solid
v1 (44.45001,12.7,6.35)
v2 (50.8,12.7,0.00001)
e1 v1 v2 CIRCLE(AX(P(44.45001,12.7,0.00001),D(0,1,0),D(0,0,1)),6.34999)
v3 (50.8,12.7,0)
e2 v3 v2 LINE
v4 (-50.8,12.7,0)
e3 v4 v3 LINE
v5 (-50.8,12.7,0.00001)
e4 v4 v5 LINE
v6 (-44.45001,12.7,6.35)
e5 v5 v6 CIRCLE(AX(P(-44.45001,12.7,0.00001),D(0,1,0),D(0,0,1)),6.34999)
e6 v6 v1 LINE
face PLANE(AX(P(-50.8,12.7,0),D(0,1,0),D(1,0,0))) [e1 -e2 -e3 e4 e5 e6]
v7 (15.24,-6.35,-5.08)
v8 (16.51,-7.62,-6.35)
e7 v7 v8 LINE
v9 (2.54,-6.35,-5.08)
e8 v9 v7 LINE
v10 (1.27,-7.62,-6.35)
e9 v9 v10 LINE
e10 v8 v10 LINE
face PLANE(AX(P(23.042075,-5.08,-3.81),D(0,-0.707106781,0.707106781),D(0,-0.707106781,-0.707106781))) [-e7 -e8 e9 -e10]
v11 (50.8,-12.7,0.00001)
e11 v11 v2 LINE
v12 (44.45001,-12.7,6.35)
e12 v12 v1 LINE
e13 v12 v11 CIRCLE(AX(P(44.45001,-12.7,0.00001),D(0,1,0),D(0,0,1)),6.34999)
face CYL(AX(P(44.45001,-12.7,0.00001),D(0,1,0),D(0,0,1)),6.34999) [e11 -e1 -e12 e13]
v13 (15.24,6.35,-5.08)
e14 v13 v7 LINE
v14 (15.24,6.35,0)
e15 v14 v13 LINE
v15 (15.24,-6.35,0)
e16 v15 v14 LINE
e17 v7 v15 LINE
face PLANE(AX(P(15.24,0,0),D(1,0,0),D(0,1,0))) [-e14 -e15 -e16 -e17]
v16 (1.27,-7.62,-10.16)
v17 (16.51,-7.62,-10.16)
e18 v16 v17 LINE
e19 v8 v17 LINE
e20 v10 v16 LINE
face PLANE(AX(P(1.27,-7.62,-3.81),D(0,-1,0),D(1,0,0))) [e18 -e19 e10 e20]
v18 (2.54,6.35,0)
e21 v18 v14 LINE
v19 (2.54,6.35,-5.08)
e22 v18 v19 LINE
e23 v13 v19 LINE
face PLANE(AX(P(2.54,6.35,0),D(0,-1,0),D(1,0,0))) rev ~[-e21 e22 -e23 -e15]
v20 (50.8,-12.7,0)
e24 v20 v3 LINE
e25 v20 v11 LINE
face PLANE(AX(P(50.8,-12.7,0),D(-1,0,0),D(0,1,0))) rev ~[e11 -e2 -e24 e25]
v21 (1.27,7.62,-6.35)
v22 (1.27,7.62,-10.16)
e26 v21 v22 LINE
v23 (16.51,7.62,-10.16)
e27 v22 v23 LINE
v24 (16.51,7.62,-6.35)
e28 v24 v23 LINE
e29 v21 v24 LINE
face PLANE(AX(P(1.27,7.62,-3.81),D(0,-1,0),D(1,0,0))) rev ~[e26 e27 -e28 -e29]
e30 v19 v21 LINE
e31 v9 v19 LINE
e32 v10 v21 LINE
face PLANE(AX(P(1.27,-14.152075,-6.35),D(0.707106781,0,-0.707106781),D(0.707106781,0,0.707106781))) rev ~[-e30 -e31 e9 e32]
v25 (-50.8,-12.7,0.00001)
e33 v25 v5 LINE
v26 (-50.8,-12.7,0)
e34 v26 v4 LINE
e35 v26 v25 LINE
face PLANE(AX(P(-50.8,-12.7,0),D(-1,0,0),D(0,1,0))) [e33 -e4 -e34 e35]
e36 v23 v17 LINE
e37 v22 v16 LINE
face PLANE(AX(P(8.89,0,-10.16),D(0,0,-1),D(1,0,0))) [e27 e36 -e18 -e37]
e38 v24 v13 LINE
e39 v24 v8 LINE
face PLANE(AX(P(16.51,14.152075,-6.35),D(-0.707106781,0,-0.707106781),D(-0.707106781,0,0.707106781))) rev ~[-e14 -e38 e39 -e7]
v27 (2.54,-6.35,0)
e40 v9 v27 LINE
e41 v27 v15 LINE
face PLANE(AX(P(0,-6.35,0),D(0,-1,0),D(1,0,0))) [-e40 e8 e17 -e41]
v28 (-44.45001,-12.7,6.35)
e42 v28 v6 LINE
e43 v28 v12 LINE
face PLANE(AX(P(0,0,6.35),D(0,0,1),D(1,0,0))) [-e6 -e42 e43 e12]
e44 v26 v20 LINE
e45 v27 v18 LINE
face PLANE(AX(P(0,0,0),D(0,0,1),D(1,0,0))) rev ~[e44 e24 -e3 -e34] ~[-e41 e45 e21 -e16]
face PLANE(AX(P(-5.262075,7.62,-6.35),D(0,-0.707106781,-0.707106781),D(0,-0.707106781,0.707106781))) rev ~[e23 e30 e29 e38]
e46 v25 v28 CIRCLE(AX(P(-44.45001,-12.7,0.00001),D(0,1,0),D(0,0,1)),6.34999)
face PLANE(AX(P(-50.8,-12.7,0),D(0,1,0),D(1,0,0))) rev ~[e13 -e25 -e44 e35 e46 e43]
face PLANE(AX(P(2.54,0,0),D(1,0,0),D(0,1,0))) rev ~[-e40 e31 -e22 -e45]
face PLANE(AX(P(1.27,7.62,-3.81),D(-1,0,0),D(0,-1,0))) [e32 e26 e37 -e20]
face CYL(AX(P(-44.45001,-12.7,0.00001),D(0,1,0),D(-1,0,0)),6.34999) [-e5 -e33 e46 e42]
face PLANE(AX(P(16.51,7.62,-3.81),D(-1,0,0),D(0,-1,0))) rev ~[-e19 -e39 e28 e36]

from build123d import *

# Parameters (mm, degrees)
F0_W          = 101.6
F0_H          = 25.4
F0_W_2        = 12.7
F0_H_2        = 12.7
F1_DEPTH      = 6.35
F2_R          = 6.34999
F3_R          = 6.34999
F4_DEPTH      = 3.81
F5_W          = 15.24
F5_H          = 15.24
F5_W_2        = 12.7
F5_H_2        = 12.7
F6_DEPTH      = 6.35
F7_T4_DEPTH   = 28.3041495789
F7_T10_DEPTH  = 28.3041495789
F7_T16_DEPTH  = 28.3041495789
F7_T23_DEPTH  = 28.3041495789
F7_T29_DEPTH  = 28.3041495789
F7_T35_DEPTH  = 28.3041495789
F7_T41_DEPTH  = 28.3041495789
F7_T47_DEPTH  = 28.3041495789
F7_T54_DEPTH  = 28.3041495789
F7_T60_DEPTH  = 28.3041495789
F7_T66_DEPTH  = 28.3041495789
F7_T72_DEPTH  = 28.3041495789
F7_T78_DEPTH  = 28.3041495789
F7_T85_DEPTH  = 28.3041495789
F7_T91_DEPTH  = 28.3041495789
F7_T97_DEPTH  = 28.3041495789
F7_T103_DEPTH = 28.3041495789
F7_T109_DEPTH = 28.3041495789
F7_T116_DEPTH = 28.3041495789
F7_T122_DEPTH = 28.3041495789


# Not quite as in the source:
# - a fillet or chamfer that OpenCascade refuses, or shapes differently, is made with other operations: its cross-section is extruded or revolved along the edge and cut away or added
# - a fillet or chamfer is up to 0.001 mm smaller than in the source, because OpenCascade refuses the exact size


with BuildPart() as f1:
    # F0 (on Top) → F1 (new body)
    with BuildSketch(Plane.XY):
        Rectangle(F0_W, F0_H)
        with Locations((8.89, 0)):
            Rectangle(F0_W_2, F0_H_2, mode=Mode.SUBTRACT)
        with Locations((8.89, 0)):
            Rectangle(F0_W_2, F0_H_2)
    extrude(amount=F1_DEPTH)

    # F2 (radius 6.35 in the source; OpenCascade refuses exactly that, so slightly less here)
    f2_edges = [f1.edges().sort_by_distance(p)[0] for p in [
        (-50.8, 0, 6.35),
    ]]
    fillet(f2_edges, radius=F2_R)

    # F3 (radius 6.35 in the source; OpenCascade refuses exactly that, so slightly less here)
    f3_edges = [f1.edges().sort_by_distance(p)[0] for p in [
        (50.8, 0, 6.35),
    ]]
    fillet(f3_edges, radius=F3_R)

    # F0 (on Top) → F4 (join)
    with BuildSketch(Plane.XY):
        with Locations((8.89, 0)):
            Rectangle(F0_W_2, F0_H_2)
    extrude(amount=-F4_DEPTH)

    # F5 (on face) → F6 (join)
    with BuildSketch(Plane(origin=(0, 0, -3.81), x_dir=(1, 0, 0), z_dir=(0, 0, -1))):
        with Locations((8.89, 0)):
            Rectangle(F5_W, F5_H)
        with Locations((8.89, 0)):
            Rectangle(F5_W_2, F5_H_2, mode=Mode.SUBTRACT)
        with Locations((8.89, 0)):
            Rectangle(F5_W_2, F5_H_2)
    extrude(amount=F6_DEPTH)

    # F7: chamfer of 2.54 on 4 edges, made by hand


with BuildPart() as f7_tool2:
    # F7_s3 → F7_t4 (new body)
    with BuildSketch(Plane.XZ.offset(14.1520747894)):
        Polygon((1.27, -6.35), (3.81, -3.81), (1.27, -3.81), align=None)
    extrude(amount=-F7_T4_DEPTH)

    split(bisect_by=Plane.XZ.offset(6.35), keep=Keep.TOP)

    split(bisect_by=Plane.YZ.offset(2.54), keep=Keep.BOTTOM)


with BuildPart() as f1_1:
    add(f1.part)

    # F7_t1: cut F7_tool2
    add(f7_tool2.part, mode=Mode.SUBTRACT)


with BuildPart() as f7_tool8:
    # F7_s9 → F7_t10 (new body)
    with BuildSketch(Plane.XZ.offset(14.1520747894)):
        Polygon((1.27, -6.35), (3.81, -3.81), (1.27, -3.81), align=None)
    extrude(amount=-F7_T10_DEPTH)

    split(bisect_by=Plane.XZ.offset(6.35), keep=Keep.TOP)

    split(bisect_by=Plane.YZ.offset(2.54), keep=Keep.TOP)


with BuildPart() as f1_2:
    add(f1_1.part)

    # F7_t7: cut F7_tool8
    add(f7_tool8.part, mode=Mode.SUBTRACT)


with BuildPart() as f7_tool14:
    # F7_s15 → F7_t16 (new body)
    with BuildSketch(Plane.XZ.offset(14.1520747894)):
        Polygon((1.27, -6.35), (3.81, -3.81), (1.27, -3.81), align=None)
    extrude(amount=-F7_T16_DEPTH)

    split(bisect_by=Plane.XZ.offset(6.35), keep=Keep.BOTTOM)

    split(bisect_by=Plane.YZ.offset(2.54), keep=Keep.BOTTOM)

    split(bisect_by=Plane.XZ.offset(-6.35), keep=Keep.TOP)


with BuildPart() as f1_3:
    add(f1_2.part)

    # F7_t13: cut F7_tool14
    add(f7_tool14.part, mode=Mode.SUBTRACT)


with BuildPart() as f7_tool21:
    # F7_s22 → F7_t23 (new body)
    with BuildSketch(Plane.XZ.offset(14.1520747894)):
        Polygon((1.27, -6.35), (3.81, -3.81), (1.27, -3.81), align=None)
    extrude(amount=-F7_T23_DEPTH)

    split(bisect_by=Plane.YZ.offset(2.54), keep=Keep.BOTTOM)

    split(bisect_by=Plane.XZ.offset(-6.35), keep=Keep.BOTTOM)


with BuildPart() as f1_4:
    add(f1_3.part)

    # F7_t20: cut F7_tool21
    add(f7_tool21.part, mode=Mode.SUBTRACT)


with BuildPart() as f7_tool27:
    # F7_s28 → F7_t29 (new body)
    with BuildSketch(Plane.XZ.offset(14.1520747894)):
        Polygon((1.27, -6.35), (3.81, -3.81), (1.27, -3.81), align=None)
    extrude(amount=-F7_T29_DEPTH)

    split(bisect_by=Plane.YZ.offset(2.54), keep=Keep.TOP)

    split(bisect_by=Plane.XZ.offset(-6.35), keep=Keep.BOTTOM)


with BuildPart() as f1_5:
    add(f1_4.part)

    # F7_t26: cut F7_tool27
    add(f7_tool27.part, mode=Mode.SUBTRACT)


with BuildPart() as f7_tool33:
    # F7_s34 → F7_t35 (new body)
    with BuildSketch(Plane.YZ.offset(23.0420747894)):
        Polygon((-5.08, -3.81), (-7.62, -6.35), (-7.62, -3.81), align=None)
    extrude(amount=-F7_T35_DEPTH)

    split(bisect_by=Plane.YZ.offset(15.24), keep=Keep.TOP)

    split(bisect_by=Plane.XZ.offset(6.35), keep=Keep.BOTTOM)


with BuildPart() as f1_6:
    add(f1_5.part)

    # F7_t32: cut F7_tool33
    add(f7_tool33.part, mode=Mode.SUBTRACT)


with BuildPart() as f7_tool39:
    # F7_s40 → F7_t41 (new body)
    with BuildSketch(Plane.YZ.offset(23.0420747894)):
        Polygon((-5.08, -3.81), (-7.62, -6.35), (-7.62, -3.81), align=None)
    extrude(amount=-F7_T41_DEPTH)

    split(bisect_by=Plane.YZ.offset(15.24), keep=Keep.TOP)

    split(bisect_by=Plane.XZ.offset(6.35), keep=Keep.TOP)


with BuildPart() as f1_7:
    add(f1_6.part)

    # F7_t38: cut F7_tool39
    add(f7_tool39.part, mode=Mode.SUBTRACT)


with BuildPart() as f7_tool45:
    # F7_s46 → F7_t47 (new body)
    with BuildSketch(Plane.YZ.offset(23.0420747894)):
        Polygon((-5.08, -3.81), (-7.62, -6.35), (-7.62, -3.81), align=None)
    extrude(amount=-F7_T47_DEPTH)

    split(bisect_by=Plane.YZ.offset(15.24), keep=Keep.BOTTOM)

    split(bisect_by=Plane.XZ.offset(6.35), keep=Keep.TOP)

    split(bisect_by=Plane.YZ.offset(2.54), keep=Keep.TOP)


with BuildPart() as f1_8:
    add(f1_7.part)

    # F7_t44: cut F7_tool45
    add(f7_tool45.part, mode=Mode.SUBTRACT)


with BuildPart() as f7_tool52:
    # F7_s53 → F7_t54 (new body)
    with BuildSketch(Plane.YZ.offset(23.0420747894)):
        Polygon((-5.08, -3.81), (-7.62, -6.35), (-7.62, -3.81), align=None)
    extrude(amount=-F7_T54_DEPTH)

    split(bisect_by=Plane.XZ.offset(6.35), keep=Keep.BOTTOM)

    split(bisect_by=Plane.YZ.offset(2.54), keep=Keep.BOTTOM)


with BuildPart() as f1_9:
    add(f1_8.part)

    # F7_t51: cut F7_tool52
    add(f7_tool52.part, mode=Mode.SUBTRACT)


with BuildPart() as f7_tool58:
    # F7_s59 → F7_t60 (new body)
    with BuildSketch(Plane.YZ.offset(23.0420747894)):
        Polygon((-5.08, -3.81), (-7.62, -6.35), (-7.62, -3.81), align=None)
    extrude(amount=-F7_T60_DEPTH)

    split(bisect_by=Plane.XZ.offset(6.35), keep=Keep.TOP)

    split(bisect_by=Plane.YZ.offset(2.54), keep=Keep.BOTTOM)


with BuildPart() as f1_10:
    add(f1_9.part)

    # F7_t57: cut F7_tool58
    add(f7_tool58.part, mode=Mode.SUBTRACT)


with BuildPart() as f7_tool64:
    # F7_s65 → F7_t66 (new body)
    with BuildSketch(Plane.XZ.offset(-14.1520747894)):
        Polygon((16.51, -6.35), (13.97, -3.81), (16.51, -3.81), align=None)
    extrude(amount=F7_T66_DEPTH)

    split(bisect_by=Plane.YZ.offset(15.24), keep=Keep.TOP)

    split(bisect_by=Plane.XZ.offset(-6.35), keep=Keep.BOTTOM)


with BuildPart() as f1_11:
    add(f1_10.part)

    # F7_t63: cut F7_tool64
    add(f7_tool64.part, mode=Mode.SUBTRACT)


with BuildPart() as f7_tool70:
    # F7_s71 → F7_t72 (new body)
    with BuildSketch(Plane.XZ.offset(-14.1520747894)):
        Polygon((16.51, -6.35), (13.97, -3.81), (16.51, -3.81), align=None)
    extrude(amount=F7_T72_DEPTH)

    split(bisect_by=Plane.YZ.offset(15.24), keep=Keep.BOTTOM)

    split(bisect_by=Plane.XZ.offset(-6.35), keep=Keep.BOTTOM)


with BuildPart() as f1_12:
    add(f1_11.part)

    # F7_t69: cut F7_tool70
    add(f7_tool70.part, mode=Mode.SUBTRACT)


with BuildPart() as f7_tool76:
    # F7_s77 → F7_t78 (new body)
    with BuildSketch(Plane.XZ.offset(-14.1520747894)):
        Polygon((16.51, -6.35), (13.97, -3.81), (16.51, -3.81), align=None)
    extrude(amount=F7_T78_DEPTH)

    split(bisect_by=Plane.YZ.offset(15.24), keep=Keep.TOP)

    split(bisect_by=Plane.XZ.offset(6.35), keep=Keep.BOTTOM)

    split(bisect_by=Plane.XZ.offset(-6.35), keep=Keep.TOP)


with BuildPart() as f1_13:
    add(f1_12.part)

    # F7_t75: cut F7_tool76
    add(f7_tool76.part, mode=Mode.SUBTRACT)


with BuildPart() as f7_tool83:
    # F7_s84 → F7_t85 (new body)
    with BuildSketch(Plane.XZ.offset(-14.1520747894)):
        Polygon((16.51, -6.35), (13.97, -3.81), (16.51, -3.81), align=None)
    extrude(amount=F7_T85_DEPTH)

    split(bisect_by=Plane.YZ.offset(15.24), keep=Keep.TOP)

    split(bisect_by=Plane.XZ.offset(6.35), keep=Keep.TOP)


with BuildPart() as f1_14:
    add(f1_13.part)

    # F7_t82: cut F7_tool83
    add(f7_tool83.part, mode=Mode.SUBTRACT)


with BuildPart() as f7_tool89:
    # F7_s90 → F7_t91 (new body)
    with BuildSketch(Plane.XZ.offset(-14.1520747894)):
        Polygon((16.51, -6.35), (13.97, -3.81), (16.51, -3.81), align=None)
    extrude(amount=F7_T91_DEPTH)

    split(bisect_by=Plane.YZ.offset(15.24), keep=Keep.BOTTOM)

    split(bisect_by=Plane.XZ.offset(6.35), keep=Keep.TOP)


with BuildPart() as f1_15:
    add(f1_14.part)

    # F7_t88: cut F7_tool89
    add(f7_tool89.part, mode=Mode.SUBTRACT)


with BuildPart() as f7_tool95:
    # F7_s96 → F7_t97 (new body)
    with BuildSketch(Plane.YZ.offset(-5.2620747894)):
        Polygon((7.62, -6.35), (5.08, -3.81), (7.62, -3.81), align=None)
    extrude(amount=F7_T97_DEPTH)

    split(bisect_by=Plane.YZ.offset(2.54), keep=Keep.BOTTOM)

    split(bisect_by=Plane.XZ.offset(-6.35), keep=Keep.BOTTOM)


with BuildPart() as f1_16:
    add(f1_15.part)

    # F7_t94: cut F7_tool95
    add(f7_tool95.part, mode=Mode.SUBTRACT)


with BuildPart() as f7_tool101:
    # F7_s102 → F7_t103 (new body)
    with BuildSketch(Plane.YZ.offset(-5.2620747894)):
        Polygon((7.62, -6.35), (5.08, -3.81), (7.62, -3.81), align=None)
    extrude(amount=F7_T103_DEPTH)

    split(bisect_by=Plane.YZ.offset(2.54), keep=Keep.BOTTOM)

    split(bisect_by=Plane.XZ.offset(-6.35), keep=Keep.TOP)


with BuildPart() as f1_17:
    add(f1_16.part)

    # F7_t100: cut F7_tool101
    add(f7_tool101.part, mode=Mode.SUBTRACT)


with BuildPart() as f7_tool107:
    # F7_s108 → F7_t109 (new body)
    with BuildSketch(Plane.YZ.offset(-5.2620747894)):
        Polygon((7.62, -6.35), (5.08, -3.81), (7.62, -3.81), align=None)
    extrude(amount=F7_T109_DEPTH)

    split(bisect_by=Plane.YZ.offset(15.24), keep=Keep.BOTTOM)

    split(bisect_by=Plane.YZ.offset(2.54), keep=Keep.TOP)

    split(bisect_by=Plane.XZ.offset(-6.35), keep=Keep.BOTTOM)


with BuildPart() as f1_18:
    add(f1_17.part)

    # F7_t106: cut F7_tool107
    add(f7_tool107.part, mode=Mode.SUBTRACT)


with BuildPart() as f7_tool114:
    # F7_s115 → F7_t116 (new body)
    with BuildSketch(Plane.YZ.offset(-5.2620747894)):
        Polygon((7.62, -6.35), (5.08, -3.81), (7.62, -3.81), align=None)
    extrude(amount=F7_T116_DEPTH)

    split(bisect_by=Plane.YZ.offset(15.24), keep=Keep.TOP)

    split(bisect_by=Plane.XZ.offset(-6.35), keep=Keep.BOTTOM)


with BuildPart() as f1_19:
    add(f1_18.part)

    # F7_t113: cut F7_tool114
    add(f7_tool114.part, mode=Mode.SUBTRACT)


with BuildPart() as f7_tool120:
    # F7_s121 → F7_t122 (new body)
    with BuildSketch(Plane.YZ.offset(-5.2620747894)):
        Polygon((7.62, -6.35), (5.08, -3.81), (7.62, -3.81), align=None)
    extrude(amount=F7_T122_DEPTH)

    split(bisect_by=Plane.YZ.offset(15.24), keep=Keep.TOP)

    split(bisect_by=Plane.XZ.offset(-6.35), keep=Keep.TOP)


with BuildPart() as f1_20:
    add(f1_19.part)

    # F7_t119: cut F7_tool120
    add(f7_tool120.part, mode=Mode.SUBTRACT)


solid = f1_20.part
